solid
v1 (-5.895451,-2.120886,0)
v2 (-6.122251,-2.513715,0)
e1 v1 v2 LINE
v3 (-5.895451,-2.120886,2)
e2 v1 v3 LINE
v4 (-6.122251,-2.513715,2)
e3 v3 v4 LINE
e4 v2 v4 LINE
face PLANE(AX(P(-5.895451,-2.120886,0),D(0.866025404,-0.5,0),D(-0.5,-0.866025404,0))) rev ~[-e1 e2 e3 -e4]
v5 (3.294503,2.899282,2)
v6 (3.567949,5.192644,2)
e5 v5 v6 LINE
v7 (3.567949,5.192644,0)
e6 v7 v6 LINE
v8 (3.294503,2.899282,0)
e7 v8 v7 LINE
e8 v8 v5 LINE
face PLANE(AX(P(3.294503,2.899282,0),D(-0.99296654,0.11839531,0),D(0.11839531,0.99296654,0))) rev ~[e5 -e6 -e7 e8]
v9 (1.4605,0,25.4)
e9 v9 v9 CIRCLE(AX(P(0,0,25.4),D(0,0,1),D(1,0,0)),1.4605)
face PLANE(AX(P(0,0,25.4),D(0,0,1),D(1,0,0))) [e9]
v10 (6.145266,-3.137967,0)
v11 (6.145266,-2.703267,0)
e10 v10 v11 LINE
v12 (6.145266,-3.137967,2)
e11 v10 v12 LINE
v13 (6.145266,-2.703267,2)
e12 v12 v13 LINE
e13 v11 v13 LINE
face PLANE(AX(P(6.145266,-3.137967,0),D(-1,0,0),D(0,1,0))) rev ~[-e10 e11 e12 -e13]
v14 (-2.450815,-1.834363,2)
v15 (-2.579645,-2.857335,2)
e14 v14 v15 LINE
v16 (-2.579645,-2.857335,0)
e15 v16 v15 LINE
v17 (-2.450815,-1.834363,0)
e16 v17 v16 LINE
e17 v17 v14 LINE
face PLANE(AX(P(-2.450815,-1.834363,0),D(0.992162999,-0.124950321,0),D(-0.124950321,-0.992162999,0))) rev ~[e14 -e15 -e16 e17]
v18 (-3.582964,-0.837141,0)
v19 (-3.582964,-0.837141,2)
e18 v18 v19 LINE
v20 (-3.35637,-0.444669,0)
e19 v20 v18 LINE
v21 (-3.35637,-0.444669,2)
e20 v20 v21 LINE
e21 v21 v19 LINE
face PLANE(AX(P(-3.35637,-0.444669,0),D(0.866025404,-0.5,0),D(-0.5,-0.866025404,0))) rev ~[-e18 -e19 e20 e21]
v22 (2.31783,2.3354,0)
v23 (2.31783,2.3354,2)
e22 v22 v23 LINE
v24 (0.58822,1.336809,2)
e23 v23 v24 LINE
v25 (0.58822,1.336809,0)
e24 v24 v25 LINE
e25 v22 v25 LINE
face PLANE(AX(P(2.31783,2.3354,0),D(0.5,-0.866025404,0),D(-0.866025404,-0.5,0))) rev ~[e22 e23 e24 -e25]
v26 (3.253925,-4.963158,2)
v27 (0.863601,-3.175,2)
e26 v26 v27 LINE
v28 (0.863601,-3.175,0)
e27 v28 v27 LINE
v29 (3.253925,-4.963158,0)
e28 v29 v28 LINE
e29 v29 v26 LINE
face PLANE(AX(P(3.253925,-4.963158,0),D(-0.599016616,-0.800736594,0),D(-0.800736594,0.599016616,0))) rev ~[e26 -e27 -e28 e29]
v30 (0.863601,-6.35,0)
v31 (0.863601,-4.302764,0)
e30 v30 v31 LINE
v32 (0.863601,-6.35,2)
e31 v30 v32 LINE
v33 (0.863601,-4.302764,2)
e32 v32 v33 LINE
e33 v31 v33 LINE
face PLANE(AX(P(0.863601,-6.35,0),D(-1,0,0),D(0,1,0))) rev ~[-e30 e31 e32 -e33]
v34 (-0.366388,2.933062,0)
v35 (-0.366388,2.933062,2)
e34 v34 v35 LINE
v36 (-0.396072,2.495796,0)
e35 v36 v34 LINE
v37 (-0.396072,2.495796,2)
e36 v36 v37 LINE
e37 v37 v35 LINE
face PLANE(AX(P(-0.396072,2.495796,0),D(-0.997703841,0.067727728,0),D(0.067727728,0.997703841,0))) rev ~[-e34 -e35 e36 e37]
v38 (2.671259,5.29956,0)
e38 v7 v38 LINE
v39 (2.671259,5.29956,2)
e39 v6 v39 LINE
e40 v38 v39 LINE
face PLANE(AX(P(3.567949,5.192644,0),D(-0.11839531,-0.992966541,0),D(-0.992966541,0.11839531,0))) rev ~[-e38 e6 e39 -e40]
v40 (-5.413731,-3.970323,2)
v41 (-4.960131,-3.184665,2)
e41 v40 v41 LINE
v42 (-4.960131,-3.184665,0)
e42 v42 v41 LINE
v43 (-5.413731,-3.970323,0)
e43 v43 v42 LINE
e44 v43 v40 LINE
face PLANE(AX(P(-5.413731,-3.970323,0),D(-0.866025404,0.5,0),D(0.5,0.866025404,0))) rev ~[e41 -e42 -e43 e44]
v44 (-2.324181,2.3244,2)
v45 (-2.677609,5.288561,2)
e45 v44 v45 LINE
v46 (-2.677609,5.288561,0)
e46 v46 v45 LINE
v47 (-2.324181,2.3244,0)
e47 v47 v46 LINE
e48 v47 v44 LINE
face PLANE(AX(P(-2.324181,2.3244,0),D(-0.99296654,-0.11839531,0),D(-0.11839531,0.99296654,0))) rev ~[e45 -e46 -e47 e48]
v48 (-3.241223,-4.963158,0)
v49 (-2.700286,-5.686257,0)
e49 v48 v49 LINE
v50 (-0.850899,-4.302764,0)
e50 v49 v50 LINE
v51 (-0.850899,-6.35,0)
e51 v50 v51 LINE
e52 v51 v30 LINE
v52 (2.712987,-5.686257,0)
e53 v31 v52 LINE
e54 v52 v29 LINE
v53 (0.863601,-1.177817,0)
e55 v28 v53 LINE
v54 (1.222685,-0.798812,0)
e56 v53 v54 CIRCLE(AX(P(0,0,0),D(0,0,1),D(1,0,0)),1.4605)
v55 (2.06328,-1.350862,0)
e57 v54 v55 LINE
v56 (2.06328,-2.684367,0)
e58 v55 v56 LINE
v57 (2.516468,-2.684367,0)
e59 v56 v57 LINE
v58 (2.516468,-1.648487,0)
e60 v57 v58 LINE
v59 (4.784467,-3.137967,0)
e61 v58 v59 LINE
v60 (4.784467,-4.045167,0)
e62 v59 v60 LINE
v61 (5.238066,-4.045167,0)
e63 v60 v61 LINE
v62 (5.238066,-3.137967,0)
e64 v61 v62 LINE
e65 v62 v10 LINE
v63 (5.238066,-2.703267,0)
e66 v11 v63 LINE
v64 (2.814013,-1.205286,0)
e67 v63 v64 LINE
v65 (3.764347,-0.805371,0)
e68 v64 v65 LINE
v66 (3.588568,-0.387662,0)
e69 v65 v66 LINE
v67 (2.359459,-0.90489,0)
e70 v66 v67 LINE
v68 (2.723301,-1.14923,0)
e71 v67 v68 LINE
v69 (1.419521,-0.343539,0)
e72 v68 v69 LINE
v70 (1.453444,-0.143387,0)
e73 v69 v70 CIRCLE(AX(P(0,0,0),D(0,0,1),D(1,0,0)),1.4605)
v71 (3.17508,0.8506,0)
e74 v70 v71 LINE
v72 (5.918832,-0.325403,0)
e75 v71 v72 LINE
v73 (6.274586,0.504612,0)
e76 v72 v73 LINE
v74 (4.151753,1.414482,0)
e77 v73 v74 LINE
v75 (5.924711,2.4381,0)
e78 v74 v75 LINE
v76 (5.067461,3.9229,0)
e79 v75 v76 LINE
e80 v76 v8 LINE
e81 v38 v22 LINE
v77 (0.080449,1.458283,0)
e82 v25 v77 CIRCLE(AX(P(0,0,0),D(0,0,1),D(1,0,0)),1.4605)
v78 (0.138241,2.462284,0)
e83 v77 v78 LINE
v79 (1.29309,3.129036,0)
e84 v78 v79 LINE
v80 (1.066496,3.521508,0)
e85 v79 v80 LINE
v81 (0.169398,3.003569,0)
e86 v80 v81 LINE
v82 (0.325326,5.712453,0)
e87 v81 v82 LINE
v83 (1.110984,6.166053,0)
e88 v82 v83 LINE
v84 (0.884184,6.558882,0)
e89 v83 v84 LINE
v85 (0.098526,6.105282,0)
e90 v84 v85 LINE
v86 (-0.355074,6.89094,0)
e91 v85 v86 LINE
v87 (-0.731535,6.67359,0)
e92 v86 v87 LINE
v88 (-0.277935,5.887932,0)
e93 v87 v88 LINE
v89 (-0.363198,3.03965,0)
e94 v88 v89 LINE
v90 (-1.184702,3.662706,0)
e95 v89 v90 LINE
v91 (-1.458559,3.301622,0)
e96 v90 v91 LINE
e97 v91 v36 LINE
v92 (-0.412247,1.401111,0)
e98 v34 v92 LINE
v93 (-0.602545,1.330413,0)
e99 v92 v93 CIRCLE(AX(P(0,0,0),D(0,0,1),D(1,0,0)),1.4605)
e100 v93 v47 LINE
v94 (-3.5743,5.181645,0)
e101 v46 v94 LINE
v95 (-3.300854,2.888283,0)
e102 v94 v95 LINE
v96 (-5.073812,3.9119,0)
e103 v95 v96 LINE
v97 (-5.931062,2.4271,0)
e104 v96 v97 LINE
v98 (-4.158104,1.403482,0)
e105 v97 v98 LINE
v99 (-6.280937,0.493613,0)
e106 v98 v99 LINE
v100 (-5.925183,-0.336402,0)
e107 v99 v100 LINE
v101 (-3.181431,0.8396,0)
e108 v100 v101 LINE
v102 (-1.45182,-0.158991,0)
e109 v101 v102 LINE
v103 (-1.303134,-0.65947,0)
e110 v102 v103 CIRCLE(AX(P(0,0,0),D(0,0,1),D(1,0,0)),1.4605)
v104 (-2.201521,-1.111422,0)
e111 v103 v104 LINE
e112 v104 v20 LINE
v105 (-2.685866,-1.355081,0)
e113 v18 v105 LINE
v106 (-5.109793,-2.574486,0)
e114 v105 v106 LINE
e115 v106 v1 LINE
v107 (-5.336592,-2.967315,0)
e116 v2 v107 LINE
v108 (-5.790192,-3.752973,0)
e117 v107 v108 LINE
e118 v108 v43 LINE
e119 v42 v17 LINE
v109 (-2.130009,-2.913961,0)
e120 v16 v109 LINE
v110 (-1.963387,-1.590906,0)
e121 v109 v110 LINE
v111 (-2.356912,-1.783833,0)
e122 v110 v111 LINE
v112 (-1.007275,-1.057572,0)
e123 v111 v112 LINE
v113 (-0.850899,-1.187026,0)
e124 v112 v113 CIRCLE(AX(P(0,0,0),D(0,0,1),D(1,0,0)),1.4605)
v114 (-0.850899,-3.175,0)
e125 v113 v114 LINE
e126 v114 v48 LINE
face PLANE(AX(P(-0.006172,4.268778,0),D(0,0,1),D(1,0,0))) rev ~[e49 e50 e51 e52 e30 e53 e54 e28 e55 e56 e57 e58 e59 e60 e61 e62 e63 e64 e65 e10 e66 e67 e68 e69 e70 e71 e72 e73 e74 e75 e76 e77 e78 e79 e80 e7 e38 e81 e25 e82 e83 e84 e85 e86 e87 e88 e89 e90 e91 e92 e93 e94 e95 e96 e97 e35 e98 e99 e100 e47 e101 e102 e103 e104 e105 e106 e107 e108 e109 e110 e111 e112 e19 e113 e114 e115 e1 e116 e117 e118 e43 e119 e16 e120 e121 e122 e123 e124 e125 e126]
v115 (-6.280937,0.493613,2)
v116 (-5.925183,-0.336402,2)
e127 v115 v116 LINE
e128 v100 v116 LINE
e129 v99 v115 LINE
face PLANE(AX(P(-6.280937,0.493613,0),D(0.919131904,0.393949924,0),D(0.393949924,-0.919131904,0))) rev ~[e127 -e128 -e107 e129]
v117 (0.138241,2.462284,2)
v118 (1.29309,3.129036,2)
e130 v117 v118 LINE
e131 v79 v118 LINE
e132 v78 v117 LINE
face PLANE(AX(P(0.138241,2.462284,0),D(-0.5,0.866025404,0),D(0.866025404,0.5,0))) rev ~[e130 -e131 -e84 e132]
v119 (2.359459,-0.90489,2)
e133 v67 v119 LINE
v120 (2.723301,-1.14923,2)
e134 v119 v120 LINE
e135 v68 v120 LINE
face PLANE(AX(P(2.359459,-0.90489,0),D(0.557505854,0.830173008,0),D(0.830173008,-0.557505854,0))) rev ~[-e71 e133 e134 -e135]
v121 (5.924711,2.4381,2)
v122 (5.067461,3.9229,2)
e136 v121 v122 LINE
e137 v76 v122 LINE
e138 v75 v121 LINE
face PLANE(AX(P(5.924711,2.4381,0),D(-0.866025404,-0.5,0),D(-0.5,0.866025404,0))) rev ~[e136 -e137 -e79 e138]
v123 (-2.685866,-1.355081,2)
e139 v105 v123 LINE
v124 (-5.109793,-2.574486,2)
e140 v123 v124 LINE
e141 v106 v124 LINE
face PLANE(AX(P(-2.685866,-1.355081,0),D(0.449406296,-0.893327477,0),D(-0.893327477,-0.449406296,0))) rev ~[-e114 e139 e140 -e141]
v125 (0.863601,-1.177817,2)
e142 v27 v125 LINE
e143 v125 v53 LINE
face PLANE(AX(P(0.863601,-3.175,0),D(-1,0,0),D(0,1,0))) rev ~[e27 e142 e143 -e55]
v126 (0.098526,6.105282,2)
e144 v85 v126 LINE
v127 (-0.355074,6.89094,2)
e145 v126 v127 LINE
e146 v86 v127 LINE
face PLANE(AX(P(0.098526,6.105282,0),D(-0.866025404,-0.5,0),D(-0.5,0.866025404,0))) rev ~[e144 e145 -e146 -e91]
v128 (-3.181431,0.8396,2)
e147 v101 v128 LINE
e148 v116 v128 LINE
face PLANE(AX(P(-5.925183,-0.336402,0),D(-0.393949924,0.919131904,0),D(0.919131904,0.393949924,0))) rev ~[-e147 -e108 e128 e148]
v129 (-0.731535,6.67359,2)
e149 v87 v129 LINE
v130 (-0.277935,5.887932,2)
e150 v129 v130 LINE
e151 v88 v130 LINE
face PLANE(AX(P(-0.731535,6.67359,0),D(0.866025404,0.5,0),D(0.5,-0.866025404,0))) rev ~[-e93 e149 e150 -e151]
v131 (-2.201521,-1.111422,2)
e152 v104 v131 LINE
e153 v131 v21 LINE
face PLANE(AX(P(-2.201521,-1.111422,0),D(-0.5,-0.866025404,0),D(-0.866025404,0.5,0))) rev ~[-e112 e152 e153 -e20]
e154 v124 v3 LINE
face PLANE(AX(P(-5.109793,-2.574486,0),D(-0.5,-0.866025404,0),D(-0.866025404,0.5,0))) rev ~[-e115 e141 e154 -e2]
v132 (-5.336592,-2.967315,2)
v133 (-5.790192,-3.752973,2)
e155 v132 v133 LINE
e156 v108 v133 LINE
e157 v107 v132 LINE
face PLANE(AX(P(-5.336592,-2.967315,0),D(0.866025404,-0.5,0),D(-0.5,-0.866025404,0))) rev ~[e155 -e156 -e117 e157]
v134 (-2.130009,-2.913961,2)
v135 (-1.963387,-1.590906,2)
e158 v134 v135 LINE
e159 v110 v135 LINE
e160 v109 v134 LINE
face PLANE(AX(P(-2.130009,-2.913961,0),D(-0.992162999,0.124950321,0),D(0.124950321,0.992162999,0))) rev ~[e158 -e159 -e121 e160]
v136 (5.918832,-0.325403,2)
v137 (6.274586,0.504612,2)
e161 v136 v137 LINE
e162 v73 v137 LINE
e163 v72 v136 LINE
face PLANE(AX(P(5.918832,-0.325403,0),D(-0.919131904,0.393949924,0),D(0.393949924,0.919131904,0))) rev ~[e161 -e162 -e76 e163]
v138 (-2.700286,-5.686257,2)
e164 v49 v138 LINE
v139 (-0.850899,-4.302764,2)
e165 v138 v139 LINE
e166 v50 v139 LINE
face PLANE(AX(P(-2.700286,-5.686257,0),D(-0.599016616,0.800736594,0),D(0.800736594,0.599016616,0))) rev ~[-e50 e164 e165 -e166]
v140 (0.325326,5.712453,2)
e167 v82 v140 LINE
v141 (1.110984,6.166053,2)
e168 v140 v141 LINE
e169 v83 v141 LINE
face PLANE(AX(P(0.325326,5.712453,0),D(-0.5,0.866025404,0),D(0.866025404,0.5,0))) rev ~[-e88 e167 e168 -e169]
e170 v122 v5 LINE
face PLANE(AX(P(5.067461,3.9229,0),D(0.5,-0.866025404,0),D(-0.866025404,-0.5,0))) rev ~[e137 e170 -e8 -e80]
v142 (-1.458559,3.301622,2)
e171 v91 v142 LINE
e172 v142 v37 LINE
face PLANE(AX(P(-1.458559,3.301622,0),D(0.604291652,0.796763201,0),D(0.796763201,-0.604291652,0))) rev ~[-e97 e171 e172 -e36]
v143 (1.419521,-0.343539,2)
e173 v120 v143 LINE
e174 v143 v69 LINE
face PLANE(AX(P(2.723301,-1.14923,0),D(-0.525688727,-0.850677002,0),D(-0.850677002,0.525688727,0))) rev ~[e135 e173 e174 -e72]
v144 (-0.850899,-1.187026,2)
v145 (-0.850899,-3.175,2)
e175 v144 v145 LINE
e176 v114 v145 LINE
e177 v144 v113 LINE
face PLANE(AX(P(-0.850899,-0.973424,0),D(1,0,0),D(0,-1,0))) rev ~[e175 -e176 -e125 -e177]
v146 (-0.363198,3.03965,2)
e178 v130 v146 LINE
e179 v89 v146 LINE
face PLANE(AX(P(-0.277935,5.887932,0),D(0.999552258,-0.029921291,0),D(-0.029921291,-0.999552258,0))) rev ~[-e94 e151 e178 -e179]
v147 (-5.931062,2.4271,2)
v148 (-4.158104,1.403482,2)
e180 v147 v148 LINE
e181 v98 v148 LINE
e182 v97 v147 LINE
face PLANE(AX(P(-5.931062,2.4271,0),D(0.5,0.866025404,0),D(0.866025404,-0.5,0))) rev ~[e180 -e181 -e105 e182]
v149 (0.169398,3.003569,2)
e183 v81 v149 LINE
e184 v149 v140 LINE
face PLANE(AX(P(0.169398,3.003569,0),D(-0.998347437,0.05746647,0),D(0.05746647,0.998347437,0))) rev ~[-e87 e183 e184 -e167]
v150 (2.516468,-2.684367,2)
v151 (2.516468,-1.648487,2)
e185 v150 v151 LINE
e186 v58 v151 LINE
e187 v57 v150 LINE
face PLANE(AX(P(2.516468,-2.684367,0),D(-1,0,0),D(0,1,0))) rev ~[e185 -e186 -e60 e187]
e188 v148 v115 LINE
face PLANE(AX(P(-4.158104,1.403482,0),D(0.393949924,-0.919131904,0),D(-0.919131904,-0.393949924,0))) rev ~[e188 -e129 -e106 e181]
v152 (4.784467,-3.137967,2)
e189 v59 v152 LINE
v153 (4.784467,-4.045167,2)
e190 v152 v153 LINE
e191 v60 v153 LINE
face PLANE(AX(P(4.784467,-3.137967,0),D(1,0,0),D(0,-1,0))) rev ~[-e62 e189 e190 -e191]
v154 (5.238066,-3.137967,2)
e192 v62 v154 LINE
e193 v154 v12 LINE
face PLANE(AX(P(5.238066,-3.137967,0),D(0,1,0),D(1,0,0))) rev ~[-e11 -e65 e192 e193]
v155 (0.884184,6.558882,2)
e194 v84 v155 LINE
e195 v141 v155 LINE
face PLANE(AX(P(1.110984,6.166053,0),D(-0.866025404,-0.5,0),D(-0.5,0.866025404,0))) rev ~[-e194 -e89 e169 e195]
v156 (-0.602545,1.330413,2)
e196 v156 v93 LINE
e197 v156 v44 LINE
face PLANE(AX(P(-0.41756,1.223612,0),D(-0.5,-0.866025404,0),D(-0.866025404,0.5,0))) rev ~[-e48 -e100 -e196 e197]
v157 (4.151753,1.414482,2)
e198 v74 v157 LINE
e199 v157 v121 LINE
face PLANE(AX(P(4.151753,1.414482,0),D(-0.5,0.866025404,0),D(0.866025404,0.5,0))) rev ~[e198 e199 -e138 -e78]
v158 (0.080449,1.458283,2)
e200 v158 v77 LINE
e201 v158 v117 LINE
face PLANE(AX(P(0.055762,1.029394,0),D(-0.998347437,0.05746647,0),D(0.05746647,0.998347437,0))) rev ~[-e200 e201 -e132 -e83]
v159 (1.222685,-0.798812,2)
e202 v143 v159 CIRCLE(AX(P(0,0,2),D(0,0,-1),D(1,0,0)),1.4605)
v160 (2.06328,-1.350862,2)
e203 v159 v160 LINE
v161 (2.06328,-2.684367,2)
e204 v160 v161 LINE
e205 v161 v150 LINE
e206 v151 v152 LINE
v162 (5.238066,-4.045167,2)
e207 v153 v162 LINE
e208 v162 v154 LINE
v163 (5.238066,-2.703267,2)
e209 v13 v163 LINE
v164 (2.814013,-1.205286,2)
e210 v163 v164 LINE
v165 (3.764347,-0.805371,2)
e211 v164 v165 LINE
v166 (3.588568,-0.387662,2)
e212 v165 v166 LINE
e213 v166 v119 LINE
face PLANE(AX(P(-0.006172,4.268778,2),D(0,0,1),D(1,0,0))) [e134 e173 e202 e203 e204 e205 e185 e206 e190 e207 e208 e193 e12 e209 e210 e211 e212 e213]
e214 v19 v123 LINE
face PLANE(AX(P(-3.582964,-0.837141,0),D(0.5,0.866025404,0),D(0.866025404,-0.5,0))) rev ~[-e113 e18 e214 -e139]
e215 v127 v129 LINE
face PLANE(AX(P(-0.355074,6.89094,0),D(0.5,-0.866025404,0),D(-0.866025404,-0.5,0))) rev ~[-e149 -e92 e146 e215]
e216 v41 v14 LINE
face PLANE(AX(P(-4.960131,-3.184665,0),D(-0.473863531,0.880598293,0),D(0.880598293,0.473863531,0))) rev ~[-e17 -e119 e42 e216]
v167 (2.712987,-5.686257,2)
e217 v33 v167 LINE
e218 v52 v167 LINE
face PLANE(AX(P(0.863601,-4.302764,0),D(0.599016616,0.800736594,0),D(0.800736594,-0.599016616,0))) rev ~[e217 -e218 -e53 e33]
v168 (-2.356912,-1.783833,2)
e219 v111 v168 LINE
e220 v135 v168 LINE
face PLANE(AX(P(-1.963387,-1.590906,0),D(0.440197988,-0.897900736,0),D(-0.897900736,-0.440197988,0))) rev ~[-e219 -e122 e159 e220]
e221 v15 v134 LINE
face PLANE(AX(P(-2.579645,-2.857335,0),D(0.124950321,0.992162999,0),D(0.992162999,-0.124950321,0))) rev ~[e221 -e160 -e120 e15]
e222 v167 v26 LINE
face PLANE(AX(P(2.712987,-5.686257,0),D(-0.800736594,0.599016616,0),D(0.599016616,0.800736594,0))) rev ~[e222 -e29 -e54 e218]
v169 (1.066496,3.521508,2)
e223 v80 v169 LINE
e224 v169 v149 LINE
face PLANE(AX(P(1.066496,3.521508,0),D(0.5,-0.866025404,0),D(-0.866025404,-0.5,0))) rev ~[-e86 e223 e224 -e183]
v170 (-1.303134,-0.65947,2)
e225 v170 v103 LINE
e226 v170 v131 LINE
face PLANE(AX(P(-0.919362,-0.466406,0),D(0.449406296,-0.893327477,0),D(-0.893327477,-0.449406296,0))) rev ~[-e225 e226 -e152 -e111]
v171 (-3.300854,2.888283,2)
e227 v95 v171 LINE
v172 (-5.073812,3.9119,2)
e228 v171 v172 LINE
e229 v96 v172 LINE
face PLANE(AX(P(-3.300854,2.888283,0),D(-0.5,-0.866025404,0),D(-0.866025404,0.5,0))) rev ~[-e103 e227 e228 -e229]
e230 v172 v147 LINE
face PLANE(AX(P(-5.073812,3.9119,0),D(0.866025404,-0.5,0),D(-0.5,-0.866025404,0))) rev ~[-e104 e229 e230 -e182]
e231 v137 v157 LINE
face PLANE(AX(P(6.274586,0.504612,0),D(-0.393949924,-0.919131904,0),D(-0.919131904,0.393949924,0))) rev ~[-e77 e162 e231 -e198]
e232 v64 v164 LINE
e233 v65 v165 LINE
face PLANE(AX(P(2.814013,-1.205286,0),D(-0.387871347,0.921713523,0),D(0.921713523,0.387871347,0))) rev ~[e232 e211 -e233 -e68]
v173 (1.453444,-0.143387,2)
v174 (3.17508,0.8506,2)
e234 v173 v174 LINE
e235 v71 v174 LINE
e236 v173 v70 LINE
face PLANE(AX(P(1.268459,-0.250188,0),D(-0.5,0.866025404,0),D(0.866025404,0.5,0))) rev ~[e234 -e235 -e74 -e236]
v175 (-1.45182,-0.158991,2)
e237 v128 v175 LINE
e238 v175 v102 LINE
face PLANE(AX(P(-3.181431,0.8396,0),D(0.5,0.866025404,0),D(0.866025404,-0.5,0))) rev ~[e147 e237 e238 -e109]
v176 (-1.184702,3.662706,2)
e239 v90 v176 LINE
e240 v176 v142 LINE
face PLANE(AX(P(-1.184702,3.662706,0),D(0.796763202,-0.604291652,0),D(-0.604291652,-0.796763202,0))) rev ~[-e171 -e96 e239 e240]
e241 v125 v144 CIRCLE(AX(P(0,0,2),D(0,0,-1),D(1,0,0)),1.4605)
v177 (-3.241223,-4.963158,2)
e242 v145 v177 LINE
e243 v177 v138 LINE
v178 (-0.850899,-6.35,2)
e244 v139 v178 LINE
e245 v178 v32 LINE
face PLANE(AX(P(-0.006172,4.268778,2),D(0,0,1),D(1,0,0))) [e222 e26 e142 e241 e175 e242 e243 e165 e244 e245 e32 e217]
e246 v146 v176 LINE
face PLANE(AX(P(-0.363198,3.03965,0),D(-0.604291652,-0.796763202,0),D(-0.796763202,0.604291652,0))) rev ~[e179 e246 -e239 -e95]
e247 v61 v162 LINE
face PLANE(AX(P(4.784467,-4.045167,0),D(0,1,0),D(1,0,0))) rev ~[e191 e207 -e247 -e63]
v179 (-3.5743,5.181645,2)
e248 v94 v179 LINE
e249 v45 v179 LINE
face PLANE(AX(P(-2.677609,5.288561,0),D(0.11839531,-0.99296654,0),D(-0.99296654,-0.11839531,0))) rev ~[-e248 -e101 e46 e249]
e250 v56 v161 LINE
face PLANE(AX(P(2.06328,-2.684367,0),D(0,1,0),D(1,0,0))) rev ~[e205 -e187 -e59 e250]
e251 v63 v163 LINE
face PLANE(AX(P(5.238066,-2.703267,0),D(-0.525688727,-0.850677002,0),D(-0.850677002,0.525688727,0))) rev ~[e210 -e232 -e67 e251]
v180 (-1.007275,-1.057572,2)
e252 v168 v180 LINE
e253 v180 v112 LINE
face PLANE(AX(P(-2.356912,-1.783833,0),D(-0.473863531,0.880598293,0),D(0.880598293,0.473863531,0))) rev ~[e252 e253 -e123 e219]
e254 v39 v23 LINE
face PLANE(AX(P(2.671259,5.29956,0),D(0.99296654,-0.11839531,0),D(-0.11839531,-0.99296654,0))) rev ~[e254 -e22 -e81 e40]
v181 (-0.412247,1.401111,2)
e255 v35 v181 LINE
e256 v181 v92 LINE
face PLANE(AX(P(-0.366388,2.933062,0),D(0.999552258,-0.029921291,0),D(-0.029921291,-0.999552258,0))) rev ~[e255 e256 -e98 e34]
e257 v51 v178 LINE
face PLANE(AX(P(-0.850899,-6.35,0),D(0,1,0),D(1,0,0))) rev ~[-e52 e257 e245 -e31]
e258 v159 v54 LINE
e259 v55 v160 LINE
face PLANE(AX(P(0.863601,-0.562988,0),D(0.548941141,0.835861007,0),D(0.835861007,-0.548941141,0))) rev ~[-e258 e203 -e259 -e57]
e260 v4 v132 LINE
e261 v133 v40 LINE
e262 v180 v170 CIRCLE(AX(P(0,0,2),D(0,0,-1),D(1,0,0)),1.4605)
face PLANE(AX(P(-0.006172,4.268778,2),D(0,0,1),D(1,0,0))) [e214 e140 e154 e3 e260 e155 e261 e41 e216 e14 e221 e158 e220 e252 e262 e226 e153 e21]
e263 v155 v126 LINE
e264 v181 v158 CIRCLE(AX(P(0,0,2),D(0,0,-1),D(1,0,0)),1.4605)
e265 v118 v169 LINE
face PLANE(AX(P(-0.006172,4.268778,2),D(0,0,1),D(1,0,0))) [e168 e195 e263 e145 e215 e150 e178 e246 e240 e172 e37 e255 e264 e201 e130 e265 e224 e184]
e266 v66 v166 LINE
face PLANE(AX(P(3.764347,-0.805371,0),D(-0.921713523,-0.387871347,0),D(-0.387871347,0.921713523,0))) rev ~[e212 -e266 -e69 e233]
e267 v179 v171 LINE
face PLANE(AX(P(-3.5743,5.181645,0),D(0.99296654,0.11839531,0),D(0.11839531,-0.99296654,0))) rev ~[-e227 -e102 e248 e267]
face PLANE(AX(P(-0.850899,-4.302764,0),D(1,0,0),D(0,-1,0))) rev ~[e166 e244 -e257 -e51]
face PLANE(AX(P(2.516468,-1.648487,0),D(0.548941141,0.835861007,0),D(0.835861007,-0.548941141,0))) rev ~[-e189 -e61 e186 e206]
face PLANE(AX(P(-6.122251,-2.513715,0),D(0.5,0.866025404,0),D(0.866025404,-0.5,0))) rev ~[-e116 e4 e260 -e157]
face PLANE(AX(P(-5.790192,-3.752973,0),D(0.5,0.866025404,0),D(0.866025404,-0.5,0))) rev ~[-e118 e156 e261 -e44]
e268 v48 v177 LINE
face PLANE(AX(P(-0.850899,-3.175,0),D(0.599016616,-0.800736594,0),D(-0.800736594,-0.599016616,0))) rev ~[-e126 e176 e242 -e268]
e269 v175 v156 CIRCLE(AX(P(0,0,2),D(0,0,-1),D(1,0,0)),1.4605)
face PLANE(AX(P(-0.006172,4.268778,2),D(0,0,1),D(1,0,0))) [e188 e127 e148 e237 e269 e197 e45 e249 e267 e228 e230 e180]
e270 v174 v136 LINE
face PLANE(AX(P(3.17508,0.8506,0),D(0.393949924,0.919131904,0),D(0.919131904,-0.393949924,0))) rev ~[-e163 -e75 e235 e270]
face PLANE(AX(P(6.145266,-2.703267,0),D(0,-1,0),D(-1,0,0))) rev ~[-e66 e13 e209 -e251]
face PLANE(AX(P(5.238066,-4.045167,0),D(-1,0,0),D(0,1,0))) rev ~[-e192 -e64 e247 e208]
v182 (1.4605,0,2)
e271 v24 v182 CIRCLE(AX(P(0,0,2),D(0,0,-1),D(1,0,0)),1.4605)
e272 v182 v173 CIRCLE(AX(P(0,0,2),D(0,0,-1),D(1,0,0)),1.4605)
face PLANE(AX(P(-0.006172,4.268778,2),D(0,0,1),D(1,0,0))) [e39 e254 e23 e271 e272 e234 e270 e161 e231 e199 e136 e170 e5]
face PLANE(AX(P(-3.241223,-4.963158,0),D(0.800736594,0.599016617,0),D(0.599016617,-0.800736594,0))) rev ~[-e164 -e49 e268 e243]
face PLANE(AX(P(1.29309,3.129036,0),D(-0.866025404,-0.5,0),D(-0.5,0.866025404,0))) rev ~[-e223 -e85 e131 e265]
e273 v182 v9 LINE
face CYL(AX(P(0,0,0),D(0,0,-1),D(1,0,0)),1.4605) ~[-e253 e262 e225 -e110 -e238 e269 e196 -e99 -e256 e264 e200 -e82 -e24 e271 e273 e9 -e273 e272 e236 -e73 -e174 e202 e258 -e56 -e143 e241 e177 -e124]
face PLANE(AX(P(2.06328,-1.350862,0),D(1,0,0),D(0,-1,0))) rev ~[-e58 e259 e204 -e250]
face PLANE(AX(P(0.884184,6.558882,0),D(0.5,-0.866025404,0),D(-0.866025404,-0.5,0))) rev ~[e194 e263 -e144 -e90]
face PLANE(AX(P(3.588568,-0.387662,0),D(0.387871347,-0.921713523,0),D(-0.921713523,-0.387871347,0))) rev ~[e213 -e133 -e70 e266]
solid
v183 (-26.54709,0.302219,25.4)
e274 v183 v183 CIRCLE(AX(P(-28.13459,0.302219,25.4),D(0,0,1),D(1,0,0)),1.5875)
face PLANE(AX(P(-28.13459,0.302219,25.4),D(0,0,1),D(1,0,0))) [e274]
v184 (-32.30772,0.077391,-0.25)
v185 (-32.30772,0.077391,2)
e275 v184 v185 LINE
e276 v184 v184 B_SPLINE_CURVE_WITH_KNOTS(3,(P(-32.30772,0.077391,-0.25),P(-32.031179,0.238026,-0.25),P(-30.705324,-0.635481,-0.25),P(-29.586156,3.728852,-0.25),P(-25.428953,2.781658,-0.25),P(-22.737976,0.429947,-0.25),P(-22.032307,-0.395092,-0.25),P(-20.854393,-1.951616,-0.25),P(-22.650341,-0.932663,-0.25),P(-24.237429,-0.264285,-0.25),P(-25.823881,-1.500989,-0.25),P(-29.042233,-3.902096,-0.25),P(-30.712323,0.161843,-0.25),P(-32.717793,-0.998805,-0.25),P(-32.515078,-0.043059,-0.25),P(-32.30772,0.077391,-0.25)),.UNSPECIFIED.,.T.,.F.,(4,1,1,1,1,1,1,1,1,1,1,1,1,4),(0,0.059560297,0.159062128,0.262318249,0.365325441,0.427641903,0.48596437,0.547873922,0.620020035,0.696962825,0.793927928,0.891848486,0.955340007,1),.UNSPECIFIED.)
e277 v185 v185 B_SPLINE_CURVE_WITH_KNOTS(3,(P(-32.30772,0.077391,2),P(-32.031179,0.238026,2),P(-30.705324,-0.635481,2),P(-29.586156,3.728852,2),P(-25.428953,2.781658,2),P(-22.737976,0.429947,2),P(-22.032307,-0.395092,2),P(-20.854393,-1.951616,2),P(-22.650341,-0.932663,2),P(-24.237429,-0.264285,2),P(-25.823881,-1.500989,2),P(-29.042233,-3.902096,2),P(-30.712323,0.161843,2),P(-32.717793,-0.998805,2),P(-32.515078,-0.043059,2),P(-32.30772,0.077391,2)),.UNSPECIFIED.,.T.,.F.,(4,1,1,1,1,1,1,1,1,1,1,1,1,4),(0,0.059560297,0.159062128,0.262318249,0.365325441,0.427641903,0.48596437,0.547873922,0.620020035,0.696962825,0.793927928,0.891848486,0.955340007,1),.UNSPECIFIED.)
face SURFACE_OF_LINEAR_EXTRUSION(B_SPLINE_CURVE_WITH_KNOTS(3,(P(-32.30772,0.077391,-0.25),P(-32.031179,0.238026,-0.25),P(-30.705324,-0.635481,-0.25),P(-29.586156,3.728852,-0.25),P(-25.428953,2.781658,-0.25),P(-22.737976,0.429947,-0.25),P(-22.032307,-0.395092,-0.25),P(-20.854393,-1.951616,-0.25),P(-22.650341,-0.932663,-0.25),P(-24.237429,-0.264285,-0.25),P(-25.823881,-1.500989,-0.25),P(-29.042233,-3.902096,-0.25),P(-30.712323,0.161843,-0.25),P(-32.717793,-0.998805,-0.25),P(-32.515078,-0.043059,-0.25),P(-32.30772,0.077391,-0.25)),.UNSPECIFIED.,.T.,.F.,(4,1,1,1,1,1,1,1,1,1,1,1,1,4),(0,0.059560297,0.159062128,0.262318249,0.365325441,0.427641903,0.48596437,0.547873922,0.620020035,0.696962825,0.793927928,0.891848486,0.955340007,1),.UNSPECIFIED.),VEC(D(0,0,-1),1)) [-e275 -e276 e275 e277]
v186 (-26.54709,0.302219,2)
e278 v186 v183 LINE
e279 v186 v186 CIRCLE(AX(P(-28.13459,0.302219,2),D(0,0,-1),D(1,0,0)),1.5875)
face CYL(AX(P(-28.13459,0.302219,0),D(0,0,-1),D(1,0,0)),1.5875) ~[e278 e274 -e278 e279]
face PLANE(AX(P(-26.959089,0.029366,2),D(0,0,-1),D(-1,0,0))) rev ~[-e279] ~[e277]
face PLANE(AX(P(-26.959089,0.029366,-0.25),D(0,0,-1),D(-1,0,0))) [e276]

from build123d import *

# Parameters (mm, degrees)
F2_DEPTH  = 2
F1_R      = 1.4605
F3_DEPTH  = 25.4
F5_DEPTH  = 1
F7_SCALE  = 2.25
F9_R      = 1.5875
F10_DEPTH = 25.4


# Not quite as in the source:
# - ends of sketch curves that miss each other by under 0.0002 mm in the source are joined


with BuildPart() as f2:
    # F0 (on Top) → F2 (new body)
    with BuildSketch(Plane.XY):
        Polygon((-0.0127014339, 0.9898670365), (0.0557615141, 1.029394138), (0.138240911, 2.4622835197), (0.1693981397, 3.0035685424), (0.3253258613, 5.7124532465), (1.1109840408, 6.166053208), (0.8841841765, 6.5588820961), (0.0985259969, 6.1052821346), (-0.3550739645, 6.8909403142), (-0.7315351504, 6.6735903472), (-0.2779351889, 5.8879321677), (-0.3631976516, 3.0396497277), (-0.3593508306, 3.0367321709), (-0.3663883129, 2.9330623245), (-0.4175601747, 1.2236123396), align=None)
        Polygon((-0.8508992831, -0.9734238887), (-0.8508992831, -0.5059332827), (-0.9193622311, -0.4664061812), (-2.2015205349, -1.1114216191), (-2.6858657296, -1.3550811789), (-5.10979256, -2.5744861629), (-5.8954507396, -2.1208862014), (-6.1222506039, -2.5137150896), (-5.3365924243, -2.967315051), (-5.7901923858, -3.7529732306), (-5.4137312, -3.9703231976), (-4.9601312385, -3.184665018), (-2.450815057, -1.8343632567), (-2.4502117892, -1.8295730336), (-2.3569123275, -1.7838327489), align=None)
        Polygon((0, 1.348e-07), (0.0063507169, 1.348e-07), (0.8636007169, 1.348e-07), (1.2684594578, -0.2501884508), (3.1750801818, 0.8505995374), (4.151752869, 1.4144817763), (5.9247108388, 2.4380995374), (5.0674608388, 3.9229000922), (3.294502869, 2.8992823311), (2.3178301818, 2.3354000922), (0.0557615141, 1.029394138), (0.0513573913, 0.9528826566), (0.4254497583, 0.7369003278), align=None)
        Polygon((0.4254495248, -0.7369004626), (-1.167e-07, -6.74e-08), (-0.0031752417, -0.0054999496), (-0.4318002417, -0.747900227), (-0.8508992831, -0.9734238887), (-0.8508992831, -3.1749998652), (-0.8508992831, -4.3027643429), (-0.8508992831, -6.3499998652), (0.8636007169, -6.3499998652), (0.8636007169, -4.3027643429), (0.8636007169, -3.1749998652), (0.8636007169, -0.5629879568), (0.7995418918, -0.5209181338), align=None)
        Polygon((-0.8508992831, -4.3027643429), (-0.8508992831, -3.1749998652), (-3.2412230885, -4.9631580294), (-2.7002857532, -5.6862570345), align=None)
        Polygon((3.2539245223, -4.9631580294), (0.8636007169, -3.1749998652), (0.8636007169, -4.3027643429), (2.7129871871, -5.6862570345), align=None)
        Polygon((2.5164675899, -1.6484873635), (2.0632796239, -1.3508619006), (2.0632796239, -2.6843671221), (2.5164675899, -2.6843671221), align=None)
        Polygon((2.359458579, -0.90489005), (2.7233006404, -1.1492295757), (2.8140127086, -1.205286471), (3.7643470012, -0.8053710598), (3.5885683743, -0.3876615832), align=None)
        Polygon((0.1693981397, 3.0035685424), (0.138240911, 2.4622835197), (1.2930903089, 3.1290361305), (1.0664963259, 3.5215084217), align=None)
        Polygon((-0.3960715185, 2.4957960936), (-0.3663883129, 2.9330623245), (-0.3631976516, 3.0396497277), (-1.1847017034, 3.6627056616), (-1.458559408, 3.301622167), align=None)
        Polygon((4.151752869, 1.4144817763), (3.1750801818, 0.8505995374), (5.9188324807, -0.3254025192), (6.274585921, 0.5046124575), align=None)
        Polygon((2.6712586753, 5.299560313), (2.3178301818, 2.3354000922), (3.294502869, 2.8992823311), (3.5679494508, 5.1926443415), align=None)
        Polygon((-2.6858657296, -1.3550811789), (-2.2015205349, -1.1114216191), (-3.3563699328, -0.4446690084), (-3.5829639158, -0.8371412996), align=None)
        Polygon((-1.9633870605, -1.5909060436), (-2.3569123275, -1.7838327489), (-2.450815057, -1.8343632567), (-2.5796452979, -2.8573346018), (-2.1300089663, -2.9139605838), align=None)
        Polygon((-3.3008535859, 2.8882825667), (-2.3241808987, 2.3244003278), (-2.6776093922, 5.2885605486), (-3.5743001677, 5.181644577), align=None)
        Polygon((-5.9251831976, -0.3364022836), (-3.1814308987, 0.839599773), (-4.1581035859, 1.4034820119), (-6.2809366379, 0.4936126931), align=None)
        Polygon((0.8636007169, 1.348e-07), (0.0063507169, 1.348e-07), (0.7995418918, -0.5209181338), (0.8636007169, -0.4839337539), align=None)
        Polygon((-0.8508992831, 1.348e-07), (0, 1.348e-07), (-0.0031754752, 0.0054998148), (-0.4318004752, 0.7479000922), (-0.4175601747, 1.2236123396), (-2.3241808987, 2.3244003278), (-3.3008535859, 2.8882825667), (-5.0738115558, 3.9119003278), (-5.9310615558, 2.427099773), (-4.1581035859, 1.4034820119), (-3.1814308987, 0.839599773), (-0.9193622311, -0.4664061812), (-0.8508992831, -0.4319645227), align=None)
        Polygon((1.2684594578, -0.2501884508), (0.8636007169, -0.4839337539), (0.8636007169, -0.5629879568), (2.0632796239, -1.3508619006), (2.5164675899, -1.6484873635), (4.7844666988, -3.1379670836), (4.7844666988, -4.0451670066), (5.2380664274, -4.0451670066), (5.2380664274, -3.1379670836), (6.1452663504, -3.1379670836), (6.1452663504, -2.7032671496), (5.2380664274, -2.7032671496), (2.8140127086, -1.205286471), (2.8095626198, -1.2071591373), (2.7233006404, -1.1492295757), align=None)
        Polygon((0.7995418918, -0.5209181338), (0.0063507169, 1.348e-07), (0, 1.348e-07), (0.4254495248, -0.7369004626), align=None)
        Polygon((-0.4318004752, 0.7479000922), (-0.0031754752, 0.0054998148), (0.0513573913, 0.9528826566), (-0.0127014339, 0.9898670365), align=None)
        Polygon((-0.0031754752, 0.0054998148), (-1.167e-07, -6.74e-08), (0.4254497583, 0.7369003278), (0.0513573913, 0.9528826566), align=None)
        Polygon((-0.4318002417, -0.747900227), (-0.0031752417, -0.0054999496), (-0.8508992831, -0.4319645227), (-0.8508992831, -0.5059332827), align=None)
        Polygon((-0.0031752417, -0.0054999496), (1.167e-07, -6.74e-08), (-0.8508992831, 1.348e-07), (-0.8508992831, -0.4319645227), align=None)
        Polygon((1.2684594578, -0.2501884508), (0.8636007169, 1.348e-07), (0.8636007169, -0.4839337539), align=None)
        Polygon((-0.8508992831, -0.9734238887), (-0.4318002417, -0.747900227), (-0.8508992831, -0.5059332827), align=None)
        Polygon((-0.0127014339, 0.9898670365), (0.0513573913, 0.9528826566), (0.0557615141, 1.029394138), align=None)
        Polygon((-0.8508992831, -0.5059332827), (-0.8508992831, -0.4319645227), (-0.9193622311, -0.4664061812), align=None)
        Polygon((-0.3631976516, 3.0396497277), (-0.3663883129, 2.9330623245), (-0.3593508306, 3.0367321709), align=None)
        Polygon((2.8140127086, -1.205286471), (2.7233006404, -1.1492295757), (2.8095626198, -1.2071591373), align=None)
        Polygon((-0.4175601747, 1.2236123396), (-0.4318004752, 0.7479000922), (-0.0127014339, 0.9898670365), align=None)
        Polygon((0.8636007169, -0.4839337539), (0.7995418918, -0.5209181338), (0.8636007169, -0.5629879568), align=None)
        Polygon((-2.450815057, -1.8343632567), (-2.3569123275, -1.7838327489), (-2.4502117892, -1.8295730336), align=None)
    extrude(amount=F2_DEPTH)

    # F1 (on Top) → F3 (join)
    with BuildSketch(Plane.XY):
        Circle(F1_R)
    extrude(amount=F3_DEPTH)


with BuildPart() as f5:
    # F4 (on Top) → F5 (new body)
    with BuildSketch(Plane.XY):
        with BuildLine():
            add(Edge.make_bspline(
                [(-29.8669375479, 0.2857499931), (-29.7440304745, 0.3571436979), (-29.1547614666, -0.031081706), (-28.6573535606, 1.9086215428), (-26.8097076406, 1.4876465764), (-25.6137182394, 0.4424417951), (-25.3000873709, 0.0757578444), (-24.7765698555, -0.6160305024), (-25.5747691832, -0.1631625611), (-26.2801418295, 0.1338939544), (-26.9852315195, -0.4157522042), (-28.4156101147, -1.4829106615), (-29.1578723902, 0.3232844338), (-30.049192476, -0.1925589818), (-29.9590967439, 0.2322169762), (-29.8669375479, 0.2857499931)],
                knots=[0, 0, 0, 0, 0.0595602967, 0.1590621278, 0.2623182491, 0.3653254409, 0.4276419031, 0.4859643703, 0.5478739218, 0.6200200353, 0.696962825, 0.7939279281, 0.8918484857, 0.9553400069, 1, 1, 1, 1], degree=3))
        make_face()
    extrude(amount=F5_DEPTH)


with BuildPart() as f5_1:
    # F7: moved
    add(f5.part.scale(F7_SCALE).moved(Location((34.892889671, -0.5655468703, -1.25))))


with BuildPart() as f5_2:
    # F8: moved
    add(f5_1.part.moved(Location((0, 0, 1))))

    # F9 (on Top) → F10 (join)
    with BuildSketch(Plane.XY):
        with Locations((-28.1345900148, 0.302218803)):
            Circle(F9_R)
    extrude(amount=F10_DEPTH)


solid = Compound([f2.part, f5_2.part])
